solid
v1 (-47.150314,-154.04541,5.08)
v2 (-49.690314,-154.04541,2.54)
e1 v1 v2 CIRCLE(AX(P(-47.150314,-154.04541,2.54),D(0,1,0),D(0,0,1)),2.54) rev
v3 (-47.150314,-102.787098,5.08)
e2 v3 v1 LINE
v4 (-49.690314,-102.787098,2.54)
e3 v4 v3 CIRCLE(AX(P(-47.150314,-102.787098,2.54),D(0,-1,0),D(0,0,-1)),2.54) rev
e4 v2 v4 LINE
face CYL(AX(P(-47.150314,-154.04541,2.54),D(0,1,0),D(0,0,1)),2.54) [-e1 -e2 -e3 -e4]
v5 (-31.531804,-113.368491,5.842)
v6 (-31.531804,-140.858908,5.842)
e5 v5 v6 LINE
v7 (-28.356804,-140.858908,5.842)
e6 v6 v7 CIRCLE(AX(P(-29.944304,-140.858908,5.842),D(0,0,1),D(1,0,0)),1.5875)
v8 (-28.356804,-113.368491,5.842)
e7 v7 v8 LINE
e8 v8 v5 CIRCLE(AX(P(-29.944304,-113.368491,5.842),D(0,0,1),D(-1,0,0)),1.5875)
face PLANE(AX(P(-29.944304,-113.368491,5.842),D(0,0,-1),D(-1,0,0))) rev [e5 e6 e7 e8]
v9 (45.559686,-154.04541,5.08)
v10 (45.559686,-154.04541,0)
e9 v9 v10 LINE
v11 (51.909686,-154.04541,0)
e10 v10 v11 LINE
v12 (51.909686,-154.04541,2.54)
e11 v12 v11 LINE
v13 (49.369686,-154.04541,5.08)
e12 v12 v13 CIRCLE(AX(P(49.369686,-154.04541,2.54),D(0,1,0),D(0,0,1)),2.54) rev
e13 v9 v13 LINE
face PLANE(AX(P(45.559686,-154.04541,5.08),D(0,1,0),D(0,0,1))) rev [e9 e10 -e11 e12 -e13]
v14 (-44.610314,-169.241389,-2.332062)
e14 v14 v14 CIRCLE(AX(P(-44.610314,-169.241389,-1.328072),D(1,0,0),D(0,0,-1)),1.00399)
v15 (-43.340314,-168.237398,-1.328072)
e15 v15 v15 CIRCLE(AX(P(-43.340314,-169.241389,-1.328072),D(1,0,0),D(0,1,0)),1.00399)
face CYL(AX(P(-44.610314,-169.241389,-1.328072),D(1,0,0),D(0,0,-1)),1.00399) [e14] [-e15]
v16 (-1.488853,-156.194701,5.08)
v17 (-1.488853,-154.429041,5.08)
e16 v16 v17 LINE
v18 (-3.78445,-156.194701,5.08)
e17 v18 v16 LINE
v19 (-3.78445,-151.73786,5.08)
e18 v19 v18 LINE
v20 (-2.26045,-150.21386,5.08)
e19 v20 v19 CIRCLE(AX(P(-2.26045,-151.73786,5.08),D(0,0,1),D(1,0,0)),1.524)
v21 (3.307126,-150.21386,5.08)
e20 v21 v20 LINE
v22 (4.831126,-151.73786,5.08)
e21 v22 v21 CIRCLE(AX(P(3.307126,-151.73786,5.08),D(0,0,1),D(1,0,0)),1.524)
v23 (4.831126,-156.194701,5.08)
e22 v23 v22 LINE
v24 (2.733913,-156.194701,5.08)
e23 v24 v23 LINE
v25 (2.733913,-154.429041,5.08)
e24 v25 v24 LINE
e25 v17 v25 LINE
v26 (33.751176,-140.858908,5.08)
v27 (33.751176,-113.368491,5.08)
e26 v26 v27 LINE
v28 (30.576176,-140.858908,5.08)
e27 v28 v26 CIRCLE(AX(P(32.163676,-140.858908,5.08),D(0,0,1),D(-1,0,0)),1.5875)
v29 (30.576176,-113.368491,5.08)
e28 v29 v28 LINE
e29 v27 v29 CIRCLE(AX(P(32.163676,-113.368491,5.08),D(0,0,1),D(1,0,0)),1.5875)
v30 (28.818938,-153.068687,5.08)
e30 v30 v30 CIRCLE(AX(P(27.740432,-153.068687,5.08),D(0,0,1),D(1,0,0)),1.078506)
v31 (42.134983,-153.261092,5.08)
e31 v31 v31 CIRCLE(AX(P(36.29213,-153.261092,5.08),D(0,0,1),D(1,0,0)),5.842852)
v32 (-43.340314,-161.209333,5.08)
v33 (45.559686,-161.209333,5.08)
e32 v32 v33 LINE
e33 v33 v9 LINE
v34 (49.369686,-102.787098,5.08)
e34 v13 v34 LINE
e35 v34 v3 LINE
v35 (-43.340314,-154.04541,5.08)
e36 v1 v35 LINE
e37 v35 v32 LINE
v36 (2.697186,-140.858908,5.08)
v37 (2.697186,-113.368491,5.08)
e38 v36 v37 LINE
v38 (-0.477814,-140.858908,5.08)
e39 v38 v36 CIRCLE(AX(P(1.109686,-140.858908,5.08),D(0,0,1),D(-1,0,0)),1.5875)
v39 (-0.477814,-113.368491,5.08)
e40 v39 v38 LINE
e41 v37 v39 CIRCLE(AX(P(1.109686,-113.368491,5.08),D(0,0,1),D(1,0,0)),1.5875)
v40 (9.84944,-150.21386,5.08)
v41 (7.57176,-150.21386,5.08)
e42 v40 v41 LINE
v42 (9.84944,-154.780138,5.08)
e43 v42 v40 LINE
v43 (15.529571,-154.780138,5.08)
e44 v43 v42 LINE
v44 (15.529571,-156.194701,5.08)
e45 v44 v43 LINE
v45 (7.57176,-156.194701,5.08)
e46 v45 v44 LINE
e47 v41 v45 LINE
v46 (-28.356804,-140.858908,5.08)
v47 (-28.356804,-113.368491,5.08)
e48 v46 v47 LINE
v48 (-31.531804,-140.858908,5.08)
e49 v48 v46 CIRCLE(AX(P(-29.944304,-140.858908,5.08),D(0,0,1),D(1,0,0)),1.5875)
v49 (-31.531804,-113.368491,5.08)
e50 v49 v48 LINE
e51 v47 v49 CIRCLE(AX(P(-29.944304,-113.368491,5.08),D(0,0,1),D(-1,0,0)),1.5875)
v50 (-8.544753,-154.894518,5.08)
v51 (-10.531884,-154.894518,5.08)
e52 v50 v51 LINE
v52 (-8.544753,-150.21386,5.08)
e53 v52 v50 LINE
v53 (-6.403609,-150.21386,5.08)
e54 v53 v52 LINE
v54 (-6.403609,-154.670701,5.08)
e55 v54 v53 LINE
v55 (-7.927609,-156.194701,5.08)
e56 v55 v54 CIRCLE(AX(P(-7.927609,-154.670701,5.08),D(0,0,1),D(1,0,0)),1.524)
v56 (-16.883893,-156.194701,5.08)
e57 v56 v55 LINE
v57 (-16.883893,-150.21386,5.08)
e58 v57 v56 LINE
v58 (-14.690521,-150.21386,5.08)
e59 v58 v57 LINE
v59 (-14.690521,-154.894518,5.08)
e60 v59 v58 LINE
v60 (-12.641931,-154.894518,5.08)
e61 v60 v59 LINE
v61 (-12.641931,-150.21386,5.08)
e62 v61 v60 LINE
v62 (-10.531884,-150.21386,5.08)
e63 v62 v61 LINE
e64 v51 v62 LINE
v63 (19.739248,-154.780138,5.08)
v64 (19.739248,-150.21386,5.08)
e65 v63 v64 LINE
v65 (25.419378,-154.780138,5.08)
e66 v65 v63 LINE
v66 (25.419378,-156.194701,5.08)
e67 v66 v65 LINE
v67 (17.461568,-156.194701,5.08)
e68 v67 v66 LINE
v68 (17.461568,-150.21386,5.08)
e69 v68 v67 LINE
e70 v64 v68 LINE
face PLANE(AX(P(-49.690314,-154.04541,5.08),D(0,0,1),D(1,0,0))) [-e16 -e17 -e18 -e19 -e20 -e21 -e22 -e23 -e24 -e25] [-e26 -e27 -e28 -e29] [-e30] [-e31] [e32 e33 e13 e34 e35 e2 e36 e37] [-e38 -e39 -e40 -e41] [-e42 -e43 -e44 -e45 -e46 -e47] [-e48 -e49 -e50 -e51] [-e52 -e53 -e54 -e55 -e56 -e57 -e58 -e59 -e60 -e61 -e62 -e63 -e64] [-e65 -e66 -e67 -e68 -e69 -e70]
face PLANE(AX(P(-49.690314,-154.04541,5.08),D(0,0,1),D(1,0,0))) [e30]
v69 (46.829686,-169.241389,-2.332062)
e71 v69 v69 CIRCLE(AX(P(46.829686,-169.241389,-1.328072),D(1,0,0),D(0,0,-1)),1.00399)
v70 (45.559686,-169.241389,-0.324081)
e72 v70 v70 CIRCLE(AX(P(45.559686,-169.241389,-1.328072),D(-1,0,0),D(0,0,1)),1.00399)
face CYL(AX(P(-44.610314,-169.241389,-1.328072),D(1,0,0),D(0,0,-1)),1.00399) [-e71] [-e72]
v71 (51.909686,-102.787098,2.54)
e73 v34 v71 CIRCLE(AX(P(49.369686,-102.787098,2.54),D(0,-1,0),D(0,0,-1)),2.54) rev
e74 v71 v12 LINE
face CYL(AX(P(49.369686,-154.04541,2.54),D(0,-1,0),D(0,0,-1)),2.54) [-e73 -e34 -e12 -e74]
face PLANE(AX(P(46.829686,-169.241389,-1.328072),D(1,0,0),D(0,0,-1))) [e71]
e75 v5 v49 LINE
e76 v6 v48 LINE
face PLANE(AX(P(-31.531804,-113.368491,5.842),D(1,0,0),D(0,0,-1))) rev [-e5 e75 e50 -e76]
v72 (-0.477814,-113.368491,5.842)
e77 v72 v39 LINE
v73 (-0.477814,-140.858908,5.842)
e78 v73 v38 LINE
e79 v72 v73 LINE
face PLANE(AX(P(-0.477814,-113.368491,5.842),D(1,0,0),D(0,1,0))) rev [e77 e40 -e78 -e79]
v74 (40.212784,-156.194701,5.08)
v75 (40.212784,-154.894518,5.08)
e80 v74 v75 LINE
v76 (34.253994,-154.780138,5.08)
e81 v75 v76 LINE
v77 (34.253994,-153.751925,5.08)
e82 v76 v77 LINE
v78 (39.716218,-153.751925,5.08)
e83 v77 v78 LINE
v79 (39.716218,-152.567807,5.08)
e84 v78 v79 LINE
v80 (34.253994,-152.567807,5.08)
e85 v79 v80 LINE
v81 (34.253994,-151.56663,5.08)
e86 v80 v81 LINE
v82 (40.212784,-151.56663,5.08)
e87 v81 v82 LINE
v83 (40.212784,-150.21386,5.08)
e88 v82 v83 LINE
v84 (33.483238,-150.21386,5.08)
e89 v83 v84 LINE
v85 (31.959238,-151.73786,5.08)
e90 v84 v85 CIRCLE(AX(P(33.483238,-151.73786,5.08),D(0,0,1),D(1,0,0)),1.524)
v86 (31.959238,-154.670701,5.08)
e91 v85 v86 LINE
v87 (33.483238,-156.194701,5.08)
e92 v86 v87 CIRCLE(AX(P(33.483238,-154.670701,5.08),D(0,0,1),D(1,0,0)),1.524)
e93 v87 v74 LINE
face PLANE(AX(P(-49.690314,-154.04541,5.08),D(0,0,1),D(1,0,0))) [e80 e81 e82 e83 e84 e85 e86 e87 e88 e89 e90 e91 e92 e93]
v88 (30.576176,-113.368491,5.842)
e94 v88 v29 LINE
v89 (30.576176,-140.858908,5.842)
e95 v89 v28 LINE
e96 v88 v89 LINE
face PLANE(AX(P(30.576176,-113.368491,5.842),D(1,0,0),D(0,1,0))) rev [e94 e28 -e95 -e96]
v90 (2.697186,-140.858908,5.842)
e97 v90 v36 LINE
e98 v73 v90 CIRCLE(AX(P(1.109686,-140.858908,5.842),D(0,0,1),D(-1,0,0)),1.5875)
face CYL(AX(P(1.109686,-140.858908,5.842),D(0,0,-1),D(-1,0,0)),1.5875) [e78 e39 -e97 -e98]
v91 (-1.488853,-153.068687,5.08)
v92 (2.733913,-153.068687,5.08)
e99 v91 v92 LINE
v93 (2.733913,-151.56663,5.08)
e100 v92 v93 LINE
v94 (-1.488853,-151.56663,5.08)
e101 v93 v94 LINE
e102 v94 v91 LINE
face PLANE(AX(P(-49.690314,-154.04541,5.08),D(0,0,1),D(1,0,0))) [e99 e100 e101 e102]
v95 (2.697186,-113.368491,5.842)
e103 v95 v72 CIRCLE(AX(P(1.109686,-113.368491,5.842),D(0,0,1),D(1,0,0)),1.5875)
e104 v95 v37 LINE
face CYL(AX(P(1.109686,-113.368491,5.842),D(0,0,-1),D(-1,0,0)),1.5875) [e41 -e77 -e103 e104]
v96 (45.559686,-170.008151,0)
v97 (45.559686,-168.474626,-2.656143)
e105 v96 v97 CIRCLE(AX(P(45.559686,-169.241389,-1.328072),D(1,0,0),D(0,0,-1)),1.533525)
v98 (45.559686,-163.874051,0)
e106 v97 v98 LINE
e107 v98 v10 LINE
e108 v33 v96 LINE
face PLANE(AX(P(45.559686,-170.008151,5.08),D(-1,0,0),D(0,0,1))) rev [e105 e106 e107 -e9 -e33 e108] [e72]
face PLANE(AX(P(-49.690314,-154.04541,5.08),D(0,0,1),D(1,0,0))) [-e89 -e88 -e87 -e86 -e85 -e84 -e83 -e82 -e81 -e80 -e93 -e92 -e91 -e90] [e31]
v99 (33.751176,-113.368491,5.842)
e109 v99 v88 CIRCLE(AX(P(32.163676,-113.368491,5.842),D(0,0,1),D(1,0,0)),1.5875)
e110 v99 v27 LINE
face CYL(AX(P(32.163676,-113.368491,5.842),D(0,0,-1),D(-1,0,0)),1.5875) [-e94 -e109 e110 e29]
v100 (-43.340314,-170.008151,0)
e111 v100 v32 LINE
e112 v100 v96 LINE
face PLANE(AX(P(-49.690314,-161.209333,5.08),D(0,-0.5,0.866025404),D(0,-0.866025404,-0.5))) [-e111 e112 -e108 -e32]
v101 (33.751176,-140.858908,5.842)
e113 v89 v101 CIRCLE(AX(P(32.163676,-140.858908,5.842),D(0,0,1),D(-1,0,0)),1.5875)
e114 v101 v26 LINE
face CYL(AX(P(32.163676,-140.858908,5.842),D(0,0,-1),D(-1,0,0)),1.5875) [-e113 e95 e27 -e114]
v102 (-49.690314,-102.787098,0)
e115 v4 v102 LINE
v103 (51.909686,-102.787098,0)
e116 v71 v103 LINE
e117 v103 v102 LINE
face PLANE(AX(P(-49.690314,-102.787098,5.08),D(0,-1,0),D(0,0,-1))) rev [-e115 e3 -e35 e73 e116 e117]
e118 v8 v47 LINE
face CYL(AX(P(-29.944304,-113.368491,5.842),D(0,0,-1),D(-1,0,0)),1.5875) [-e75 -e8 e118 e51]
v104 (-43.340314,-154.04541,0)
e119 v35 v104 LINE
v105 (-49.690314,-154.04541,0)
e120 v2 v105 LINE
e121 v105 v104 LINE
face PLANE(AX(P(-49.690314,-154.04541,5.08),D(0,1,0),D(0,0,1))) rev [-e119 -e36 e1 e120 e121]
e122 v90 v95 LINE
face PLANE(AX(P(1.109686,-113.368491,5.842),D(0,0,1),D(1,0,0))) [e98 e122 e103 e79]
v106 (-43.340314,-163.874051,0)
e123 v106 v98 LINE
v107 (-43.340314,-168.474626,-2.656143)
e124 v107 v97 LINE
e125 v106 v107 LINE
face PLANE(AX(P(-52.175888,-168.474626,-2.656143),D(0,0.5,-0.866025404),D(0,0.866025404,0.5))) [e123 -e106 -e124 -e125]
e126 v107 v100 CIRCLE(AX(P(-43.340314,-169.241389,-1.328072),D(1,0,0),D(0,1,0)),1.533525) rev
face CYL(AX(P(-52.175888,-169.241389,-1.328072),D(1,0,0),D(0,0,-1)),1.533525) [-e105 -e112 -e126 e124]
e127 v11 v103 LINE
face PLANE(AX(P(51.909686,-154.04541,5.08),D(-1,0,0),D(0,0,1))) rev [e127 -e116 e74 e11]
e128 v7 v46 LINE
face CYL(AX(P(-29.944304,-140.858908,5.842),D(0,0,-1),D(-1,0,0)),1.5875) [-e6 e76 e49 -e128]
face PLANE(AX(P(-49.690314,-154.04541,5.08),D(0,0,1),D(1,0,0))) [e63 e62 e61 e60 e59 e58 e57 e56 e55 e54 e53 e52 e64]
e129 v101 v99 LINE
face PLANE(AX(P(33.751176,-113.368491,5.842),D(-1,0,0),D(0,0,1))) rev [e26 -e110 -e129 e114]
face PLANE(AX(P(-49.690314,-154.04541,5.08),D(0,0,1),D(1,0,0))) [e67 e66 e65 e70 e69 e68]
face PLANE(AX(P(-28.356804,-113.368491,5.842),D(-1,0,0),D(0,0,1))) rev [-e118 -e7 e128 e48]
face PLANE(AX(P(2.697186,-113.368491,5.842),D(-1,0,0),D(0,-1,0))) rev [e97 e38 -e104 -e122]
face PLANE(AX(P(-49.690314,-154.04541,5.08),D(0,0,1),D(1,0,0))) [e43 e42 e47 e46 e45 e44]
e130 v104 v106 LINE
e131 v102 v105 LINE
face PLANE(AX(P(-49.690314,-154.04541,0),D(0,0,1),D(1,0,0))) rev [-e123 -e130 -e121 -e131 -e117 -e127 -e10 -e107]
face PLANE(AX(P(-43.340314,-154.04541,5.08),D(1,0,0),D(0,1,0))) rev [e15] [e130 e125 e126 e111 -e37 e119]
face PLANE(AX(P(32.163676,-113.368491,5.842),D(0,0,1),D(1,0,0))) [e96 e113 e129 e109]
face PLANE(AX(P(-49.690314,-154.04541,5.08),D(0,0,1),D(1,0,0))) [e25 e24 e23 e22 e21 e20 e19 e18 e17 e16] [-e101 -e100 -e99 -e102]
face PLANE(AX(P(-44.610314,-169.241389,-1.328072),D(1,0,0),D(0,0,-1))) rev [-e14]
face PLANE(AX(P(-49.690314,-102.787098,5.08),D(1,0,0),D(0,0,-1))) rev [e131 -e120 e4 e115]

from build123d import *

# Parameters (mm, degrees)
EXTRUDE1_DEPTH               = 5.08
FILLET1_R                    = 2.54
CHAMFER1_SIZE2               = 5.08
CHAMFER1_SIZE                = 8.798818102
EXTRUDE3_DEPTH               = 88.9
EXTRUDE4_DEPTH               = 0.762
SALIENTE_EXTRUIR1_DEPTH      = 1.27
SALIENTE_EXTRUIR1_DEPTH_BACK = 90.17
SKETCH2_R                    = 1.003990475


with BuildPart() as part:
    # Sketch1 → Extrude1 (new body)
    with BuildSketch(Plane.XY):
        Polygon((-49.690313901, -102.787097767), (51.909686099, -102.787097767), (51.909686099, -154.045409896), (45.559686099, -154.045409896), (45.559686099, -170.008151162), (-43.340313901, -170.008151162), (-43.340313901, -154.045409896), (-49.690313901, -154.045409896), align=None)
    extrude(amount=EXTRUDE1_DEPTH)

    # Fillet1
    fillet1_edges = [part.edges().sort_by_distance(p)[0] for p in [
        (51.909686099, -128.416253832, 5.08),
        (-49.690313901, -128.416253832, 5.08),
    ]]
    fillet(fillet1_edges, radius=FILLET1_R)

    # Chamfer1
    chamfer1_edges = [part.edges().sort_by_distance(p)[0] for p in [
        (1.109686099, -170.008151162, 5.08),
    ]]
    chamfer1_side = [part.faces().sort_by_distance(p)[0] for p in [
        (1.109686099, -169.906551162, 5.08),
    ]]
    chamfer(chamfer1_edges, length=CHAMFER1_SIZE - 0.0001, length2=CHAMFER1_SIZE2 - 0.0001, reference=chamfer1_side[0])  # a hair under: the kernel refuses the full size

    # Sketch3 → Extrude3 (add)
    with BuildSketch(Plane(origin=(45.559686099, 0, 0), x_dir=(0, 0, -1), z_dir=(1, 0, 0))):
        with BuildLine():
            Line((-2.656143456, -165.407575745), (0, -170.008151162))
            ThreePointArc((0, -170.008151162), (2.094834297, -170.56946032), (2.656143456, -168.474626023))
            Line((2.656143456, -168.474626023), (0, -163.874050605))
            Line((0, -163.874050605), (-2.656143456, -165.407575745))
        make_face()
    extrude(amount=-EXTRUDE3_DEPTH)

    # Sketch4 → Extrude4 (add)
    with BuildSketch(Plane.XY.offset(5.08)):
        with BuildLine():
            Line((2.697186099, -113.368491021), (2.697186099, -140.858908158))
            ThreePointArc((2.697186099, -140.858908158), (1.109686099, -142.446408158), (-0.477813901, -140.858908158))
            Line((-0.477813901, -140.858908158), (-0.477813901, -113.368491021))
            ThreePointArc((-0.477813901, -113.368491021), (1.109686099, -111.780991021), (2.697186099, -113.368491021))
        make_face()
        with BuildLine():
            Line((-31.531803629, -113.368491021), (-31.531803629, -140.858908158))
            ThreePointArc((-31.531803629, -140.858908158), (-29.944303629, -142.446408158), (-28.356803629, -140.858908158))
            Line((-28.356803629, -140.858908158), (-28.356803629, -113.368491021))
            ThreePointArc((-28.356803629, -113.368491021), (-29.944303629, -111.780991021), (-31.531803629, -113.368491021))
        make_face()
        with BuildLine():
            Line((33.751175827, -113.368491021), (33.751175827, -140.858908158))
            ThreePointArc((33.751175827, -140.858908158), (32.163675827, -142.446408158), (30.576175827, -140.858908158))
            Line((30.576175827, -140.858908158), (30.576175827, -113.368491021))
            ThreePointArc((30.576175827, -113.368491021), (32.163675827, -111.780991021), (33.751175827, -113.368491021))
        make_face()
    extrude(amount=EXTRUDE4_DEPTH)

    # Sketch2 → Saliente-Extruir1 (add, two sides: drawn at the far end of the back side and taken through both)
    with BuildSketch(Plane(origin=(45.559686099, 0, 0), x_dir=(0, 0, -1), z_dir=(1, 0, 0)).offset(-SALIENTE_EXTRUIR1_DEPTH_BACK)):
        with Locations((1.328071728, -169.241388592)):
            Circle(SKETCH2_R)
    extrude(amount=SALIENTE_EXTRUIR1_DEPTH + SALIENTE_EXTRUIR1_DEPTH_BACK)


solid = part.part
